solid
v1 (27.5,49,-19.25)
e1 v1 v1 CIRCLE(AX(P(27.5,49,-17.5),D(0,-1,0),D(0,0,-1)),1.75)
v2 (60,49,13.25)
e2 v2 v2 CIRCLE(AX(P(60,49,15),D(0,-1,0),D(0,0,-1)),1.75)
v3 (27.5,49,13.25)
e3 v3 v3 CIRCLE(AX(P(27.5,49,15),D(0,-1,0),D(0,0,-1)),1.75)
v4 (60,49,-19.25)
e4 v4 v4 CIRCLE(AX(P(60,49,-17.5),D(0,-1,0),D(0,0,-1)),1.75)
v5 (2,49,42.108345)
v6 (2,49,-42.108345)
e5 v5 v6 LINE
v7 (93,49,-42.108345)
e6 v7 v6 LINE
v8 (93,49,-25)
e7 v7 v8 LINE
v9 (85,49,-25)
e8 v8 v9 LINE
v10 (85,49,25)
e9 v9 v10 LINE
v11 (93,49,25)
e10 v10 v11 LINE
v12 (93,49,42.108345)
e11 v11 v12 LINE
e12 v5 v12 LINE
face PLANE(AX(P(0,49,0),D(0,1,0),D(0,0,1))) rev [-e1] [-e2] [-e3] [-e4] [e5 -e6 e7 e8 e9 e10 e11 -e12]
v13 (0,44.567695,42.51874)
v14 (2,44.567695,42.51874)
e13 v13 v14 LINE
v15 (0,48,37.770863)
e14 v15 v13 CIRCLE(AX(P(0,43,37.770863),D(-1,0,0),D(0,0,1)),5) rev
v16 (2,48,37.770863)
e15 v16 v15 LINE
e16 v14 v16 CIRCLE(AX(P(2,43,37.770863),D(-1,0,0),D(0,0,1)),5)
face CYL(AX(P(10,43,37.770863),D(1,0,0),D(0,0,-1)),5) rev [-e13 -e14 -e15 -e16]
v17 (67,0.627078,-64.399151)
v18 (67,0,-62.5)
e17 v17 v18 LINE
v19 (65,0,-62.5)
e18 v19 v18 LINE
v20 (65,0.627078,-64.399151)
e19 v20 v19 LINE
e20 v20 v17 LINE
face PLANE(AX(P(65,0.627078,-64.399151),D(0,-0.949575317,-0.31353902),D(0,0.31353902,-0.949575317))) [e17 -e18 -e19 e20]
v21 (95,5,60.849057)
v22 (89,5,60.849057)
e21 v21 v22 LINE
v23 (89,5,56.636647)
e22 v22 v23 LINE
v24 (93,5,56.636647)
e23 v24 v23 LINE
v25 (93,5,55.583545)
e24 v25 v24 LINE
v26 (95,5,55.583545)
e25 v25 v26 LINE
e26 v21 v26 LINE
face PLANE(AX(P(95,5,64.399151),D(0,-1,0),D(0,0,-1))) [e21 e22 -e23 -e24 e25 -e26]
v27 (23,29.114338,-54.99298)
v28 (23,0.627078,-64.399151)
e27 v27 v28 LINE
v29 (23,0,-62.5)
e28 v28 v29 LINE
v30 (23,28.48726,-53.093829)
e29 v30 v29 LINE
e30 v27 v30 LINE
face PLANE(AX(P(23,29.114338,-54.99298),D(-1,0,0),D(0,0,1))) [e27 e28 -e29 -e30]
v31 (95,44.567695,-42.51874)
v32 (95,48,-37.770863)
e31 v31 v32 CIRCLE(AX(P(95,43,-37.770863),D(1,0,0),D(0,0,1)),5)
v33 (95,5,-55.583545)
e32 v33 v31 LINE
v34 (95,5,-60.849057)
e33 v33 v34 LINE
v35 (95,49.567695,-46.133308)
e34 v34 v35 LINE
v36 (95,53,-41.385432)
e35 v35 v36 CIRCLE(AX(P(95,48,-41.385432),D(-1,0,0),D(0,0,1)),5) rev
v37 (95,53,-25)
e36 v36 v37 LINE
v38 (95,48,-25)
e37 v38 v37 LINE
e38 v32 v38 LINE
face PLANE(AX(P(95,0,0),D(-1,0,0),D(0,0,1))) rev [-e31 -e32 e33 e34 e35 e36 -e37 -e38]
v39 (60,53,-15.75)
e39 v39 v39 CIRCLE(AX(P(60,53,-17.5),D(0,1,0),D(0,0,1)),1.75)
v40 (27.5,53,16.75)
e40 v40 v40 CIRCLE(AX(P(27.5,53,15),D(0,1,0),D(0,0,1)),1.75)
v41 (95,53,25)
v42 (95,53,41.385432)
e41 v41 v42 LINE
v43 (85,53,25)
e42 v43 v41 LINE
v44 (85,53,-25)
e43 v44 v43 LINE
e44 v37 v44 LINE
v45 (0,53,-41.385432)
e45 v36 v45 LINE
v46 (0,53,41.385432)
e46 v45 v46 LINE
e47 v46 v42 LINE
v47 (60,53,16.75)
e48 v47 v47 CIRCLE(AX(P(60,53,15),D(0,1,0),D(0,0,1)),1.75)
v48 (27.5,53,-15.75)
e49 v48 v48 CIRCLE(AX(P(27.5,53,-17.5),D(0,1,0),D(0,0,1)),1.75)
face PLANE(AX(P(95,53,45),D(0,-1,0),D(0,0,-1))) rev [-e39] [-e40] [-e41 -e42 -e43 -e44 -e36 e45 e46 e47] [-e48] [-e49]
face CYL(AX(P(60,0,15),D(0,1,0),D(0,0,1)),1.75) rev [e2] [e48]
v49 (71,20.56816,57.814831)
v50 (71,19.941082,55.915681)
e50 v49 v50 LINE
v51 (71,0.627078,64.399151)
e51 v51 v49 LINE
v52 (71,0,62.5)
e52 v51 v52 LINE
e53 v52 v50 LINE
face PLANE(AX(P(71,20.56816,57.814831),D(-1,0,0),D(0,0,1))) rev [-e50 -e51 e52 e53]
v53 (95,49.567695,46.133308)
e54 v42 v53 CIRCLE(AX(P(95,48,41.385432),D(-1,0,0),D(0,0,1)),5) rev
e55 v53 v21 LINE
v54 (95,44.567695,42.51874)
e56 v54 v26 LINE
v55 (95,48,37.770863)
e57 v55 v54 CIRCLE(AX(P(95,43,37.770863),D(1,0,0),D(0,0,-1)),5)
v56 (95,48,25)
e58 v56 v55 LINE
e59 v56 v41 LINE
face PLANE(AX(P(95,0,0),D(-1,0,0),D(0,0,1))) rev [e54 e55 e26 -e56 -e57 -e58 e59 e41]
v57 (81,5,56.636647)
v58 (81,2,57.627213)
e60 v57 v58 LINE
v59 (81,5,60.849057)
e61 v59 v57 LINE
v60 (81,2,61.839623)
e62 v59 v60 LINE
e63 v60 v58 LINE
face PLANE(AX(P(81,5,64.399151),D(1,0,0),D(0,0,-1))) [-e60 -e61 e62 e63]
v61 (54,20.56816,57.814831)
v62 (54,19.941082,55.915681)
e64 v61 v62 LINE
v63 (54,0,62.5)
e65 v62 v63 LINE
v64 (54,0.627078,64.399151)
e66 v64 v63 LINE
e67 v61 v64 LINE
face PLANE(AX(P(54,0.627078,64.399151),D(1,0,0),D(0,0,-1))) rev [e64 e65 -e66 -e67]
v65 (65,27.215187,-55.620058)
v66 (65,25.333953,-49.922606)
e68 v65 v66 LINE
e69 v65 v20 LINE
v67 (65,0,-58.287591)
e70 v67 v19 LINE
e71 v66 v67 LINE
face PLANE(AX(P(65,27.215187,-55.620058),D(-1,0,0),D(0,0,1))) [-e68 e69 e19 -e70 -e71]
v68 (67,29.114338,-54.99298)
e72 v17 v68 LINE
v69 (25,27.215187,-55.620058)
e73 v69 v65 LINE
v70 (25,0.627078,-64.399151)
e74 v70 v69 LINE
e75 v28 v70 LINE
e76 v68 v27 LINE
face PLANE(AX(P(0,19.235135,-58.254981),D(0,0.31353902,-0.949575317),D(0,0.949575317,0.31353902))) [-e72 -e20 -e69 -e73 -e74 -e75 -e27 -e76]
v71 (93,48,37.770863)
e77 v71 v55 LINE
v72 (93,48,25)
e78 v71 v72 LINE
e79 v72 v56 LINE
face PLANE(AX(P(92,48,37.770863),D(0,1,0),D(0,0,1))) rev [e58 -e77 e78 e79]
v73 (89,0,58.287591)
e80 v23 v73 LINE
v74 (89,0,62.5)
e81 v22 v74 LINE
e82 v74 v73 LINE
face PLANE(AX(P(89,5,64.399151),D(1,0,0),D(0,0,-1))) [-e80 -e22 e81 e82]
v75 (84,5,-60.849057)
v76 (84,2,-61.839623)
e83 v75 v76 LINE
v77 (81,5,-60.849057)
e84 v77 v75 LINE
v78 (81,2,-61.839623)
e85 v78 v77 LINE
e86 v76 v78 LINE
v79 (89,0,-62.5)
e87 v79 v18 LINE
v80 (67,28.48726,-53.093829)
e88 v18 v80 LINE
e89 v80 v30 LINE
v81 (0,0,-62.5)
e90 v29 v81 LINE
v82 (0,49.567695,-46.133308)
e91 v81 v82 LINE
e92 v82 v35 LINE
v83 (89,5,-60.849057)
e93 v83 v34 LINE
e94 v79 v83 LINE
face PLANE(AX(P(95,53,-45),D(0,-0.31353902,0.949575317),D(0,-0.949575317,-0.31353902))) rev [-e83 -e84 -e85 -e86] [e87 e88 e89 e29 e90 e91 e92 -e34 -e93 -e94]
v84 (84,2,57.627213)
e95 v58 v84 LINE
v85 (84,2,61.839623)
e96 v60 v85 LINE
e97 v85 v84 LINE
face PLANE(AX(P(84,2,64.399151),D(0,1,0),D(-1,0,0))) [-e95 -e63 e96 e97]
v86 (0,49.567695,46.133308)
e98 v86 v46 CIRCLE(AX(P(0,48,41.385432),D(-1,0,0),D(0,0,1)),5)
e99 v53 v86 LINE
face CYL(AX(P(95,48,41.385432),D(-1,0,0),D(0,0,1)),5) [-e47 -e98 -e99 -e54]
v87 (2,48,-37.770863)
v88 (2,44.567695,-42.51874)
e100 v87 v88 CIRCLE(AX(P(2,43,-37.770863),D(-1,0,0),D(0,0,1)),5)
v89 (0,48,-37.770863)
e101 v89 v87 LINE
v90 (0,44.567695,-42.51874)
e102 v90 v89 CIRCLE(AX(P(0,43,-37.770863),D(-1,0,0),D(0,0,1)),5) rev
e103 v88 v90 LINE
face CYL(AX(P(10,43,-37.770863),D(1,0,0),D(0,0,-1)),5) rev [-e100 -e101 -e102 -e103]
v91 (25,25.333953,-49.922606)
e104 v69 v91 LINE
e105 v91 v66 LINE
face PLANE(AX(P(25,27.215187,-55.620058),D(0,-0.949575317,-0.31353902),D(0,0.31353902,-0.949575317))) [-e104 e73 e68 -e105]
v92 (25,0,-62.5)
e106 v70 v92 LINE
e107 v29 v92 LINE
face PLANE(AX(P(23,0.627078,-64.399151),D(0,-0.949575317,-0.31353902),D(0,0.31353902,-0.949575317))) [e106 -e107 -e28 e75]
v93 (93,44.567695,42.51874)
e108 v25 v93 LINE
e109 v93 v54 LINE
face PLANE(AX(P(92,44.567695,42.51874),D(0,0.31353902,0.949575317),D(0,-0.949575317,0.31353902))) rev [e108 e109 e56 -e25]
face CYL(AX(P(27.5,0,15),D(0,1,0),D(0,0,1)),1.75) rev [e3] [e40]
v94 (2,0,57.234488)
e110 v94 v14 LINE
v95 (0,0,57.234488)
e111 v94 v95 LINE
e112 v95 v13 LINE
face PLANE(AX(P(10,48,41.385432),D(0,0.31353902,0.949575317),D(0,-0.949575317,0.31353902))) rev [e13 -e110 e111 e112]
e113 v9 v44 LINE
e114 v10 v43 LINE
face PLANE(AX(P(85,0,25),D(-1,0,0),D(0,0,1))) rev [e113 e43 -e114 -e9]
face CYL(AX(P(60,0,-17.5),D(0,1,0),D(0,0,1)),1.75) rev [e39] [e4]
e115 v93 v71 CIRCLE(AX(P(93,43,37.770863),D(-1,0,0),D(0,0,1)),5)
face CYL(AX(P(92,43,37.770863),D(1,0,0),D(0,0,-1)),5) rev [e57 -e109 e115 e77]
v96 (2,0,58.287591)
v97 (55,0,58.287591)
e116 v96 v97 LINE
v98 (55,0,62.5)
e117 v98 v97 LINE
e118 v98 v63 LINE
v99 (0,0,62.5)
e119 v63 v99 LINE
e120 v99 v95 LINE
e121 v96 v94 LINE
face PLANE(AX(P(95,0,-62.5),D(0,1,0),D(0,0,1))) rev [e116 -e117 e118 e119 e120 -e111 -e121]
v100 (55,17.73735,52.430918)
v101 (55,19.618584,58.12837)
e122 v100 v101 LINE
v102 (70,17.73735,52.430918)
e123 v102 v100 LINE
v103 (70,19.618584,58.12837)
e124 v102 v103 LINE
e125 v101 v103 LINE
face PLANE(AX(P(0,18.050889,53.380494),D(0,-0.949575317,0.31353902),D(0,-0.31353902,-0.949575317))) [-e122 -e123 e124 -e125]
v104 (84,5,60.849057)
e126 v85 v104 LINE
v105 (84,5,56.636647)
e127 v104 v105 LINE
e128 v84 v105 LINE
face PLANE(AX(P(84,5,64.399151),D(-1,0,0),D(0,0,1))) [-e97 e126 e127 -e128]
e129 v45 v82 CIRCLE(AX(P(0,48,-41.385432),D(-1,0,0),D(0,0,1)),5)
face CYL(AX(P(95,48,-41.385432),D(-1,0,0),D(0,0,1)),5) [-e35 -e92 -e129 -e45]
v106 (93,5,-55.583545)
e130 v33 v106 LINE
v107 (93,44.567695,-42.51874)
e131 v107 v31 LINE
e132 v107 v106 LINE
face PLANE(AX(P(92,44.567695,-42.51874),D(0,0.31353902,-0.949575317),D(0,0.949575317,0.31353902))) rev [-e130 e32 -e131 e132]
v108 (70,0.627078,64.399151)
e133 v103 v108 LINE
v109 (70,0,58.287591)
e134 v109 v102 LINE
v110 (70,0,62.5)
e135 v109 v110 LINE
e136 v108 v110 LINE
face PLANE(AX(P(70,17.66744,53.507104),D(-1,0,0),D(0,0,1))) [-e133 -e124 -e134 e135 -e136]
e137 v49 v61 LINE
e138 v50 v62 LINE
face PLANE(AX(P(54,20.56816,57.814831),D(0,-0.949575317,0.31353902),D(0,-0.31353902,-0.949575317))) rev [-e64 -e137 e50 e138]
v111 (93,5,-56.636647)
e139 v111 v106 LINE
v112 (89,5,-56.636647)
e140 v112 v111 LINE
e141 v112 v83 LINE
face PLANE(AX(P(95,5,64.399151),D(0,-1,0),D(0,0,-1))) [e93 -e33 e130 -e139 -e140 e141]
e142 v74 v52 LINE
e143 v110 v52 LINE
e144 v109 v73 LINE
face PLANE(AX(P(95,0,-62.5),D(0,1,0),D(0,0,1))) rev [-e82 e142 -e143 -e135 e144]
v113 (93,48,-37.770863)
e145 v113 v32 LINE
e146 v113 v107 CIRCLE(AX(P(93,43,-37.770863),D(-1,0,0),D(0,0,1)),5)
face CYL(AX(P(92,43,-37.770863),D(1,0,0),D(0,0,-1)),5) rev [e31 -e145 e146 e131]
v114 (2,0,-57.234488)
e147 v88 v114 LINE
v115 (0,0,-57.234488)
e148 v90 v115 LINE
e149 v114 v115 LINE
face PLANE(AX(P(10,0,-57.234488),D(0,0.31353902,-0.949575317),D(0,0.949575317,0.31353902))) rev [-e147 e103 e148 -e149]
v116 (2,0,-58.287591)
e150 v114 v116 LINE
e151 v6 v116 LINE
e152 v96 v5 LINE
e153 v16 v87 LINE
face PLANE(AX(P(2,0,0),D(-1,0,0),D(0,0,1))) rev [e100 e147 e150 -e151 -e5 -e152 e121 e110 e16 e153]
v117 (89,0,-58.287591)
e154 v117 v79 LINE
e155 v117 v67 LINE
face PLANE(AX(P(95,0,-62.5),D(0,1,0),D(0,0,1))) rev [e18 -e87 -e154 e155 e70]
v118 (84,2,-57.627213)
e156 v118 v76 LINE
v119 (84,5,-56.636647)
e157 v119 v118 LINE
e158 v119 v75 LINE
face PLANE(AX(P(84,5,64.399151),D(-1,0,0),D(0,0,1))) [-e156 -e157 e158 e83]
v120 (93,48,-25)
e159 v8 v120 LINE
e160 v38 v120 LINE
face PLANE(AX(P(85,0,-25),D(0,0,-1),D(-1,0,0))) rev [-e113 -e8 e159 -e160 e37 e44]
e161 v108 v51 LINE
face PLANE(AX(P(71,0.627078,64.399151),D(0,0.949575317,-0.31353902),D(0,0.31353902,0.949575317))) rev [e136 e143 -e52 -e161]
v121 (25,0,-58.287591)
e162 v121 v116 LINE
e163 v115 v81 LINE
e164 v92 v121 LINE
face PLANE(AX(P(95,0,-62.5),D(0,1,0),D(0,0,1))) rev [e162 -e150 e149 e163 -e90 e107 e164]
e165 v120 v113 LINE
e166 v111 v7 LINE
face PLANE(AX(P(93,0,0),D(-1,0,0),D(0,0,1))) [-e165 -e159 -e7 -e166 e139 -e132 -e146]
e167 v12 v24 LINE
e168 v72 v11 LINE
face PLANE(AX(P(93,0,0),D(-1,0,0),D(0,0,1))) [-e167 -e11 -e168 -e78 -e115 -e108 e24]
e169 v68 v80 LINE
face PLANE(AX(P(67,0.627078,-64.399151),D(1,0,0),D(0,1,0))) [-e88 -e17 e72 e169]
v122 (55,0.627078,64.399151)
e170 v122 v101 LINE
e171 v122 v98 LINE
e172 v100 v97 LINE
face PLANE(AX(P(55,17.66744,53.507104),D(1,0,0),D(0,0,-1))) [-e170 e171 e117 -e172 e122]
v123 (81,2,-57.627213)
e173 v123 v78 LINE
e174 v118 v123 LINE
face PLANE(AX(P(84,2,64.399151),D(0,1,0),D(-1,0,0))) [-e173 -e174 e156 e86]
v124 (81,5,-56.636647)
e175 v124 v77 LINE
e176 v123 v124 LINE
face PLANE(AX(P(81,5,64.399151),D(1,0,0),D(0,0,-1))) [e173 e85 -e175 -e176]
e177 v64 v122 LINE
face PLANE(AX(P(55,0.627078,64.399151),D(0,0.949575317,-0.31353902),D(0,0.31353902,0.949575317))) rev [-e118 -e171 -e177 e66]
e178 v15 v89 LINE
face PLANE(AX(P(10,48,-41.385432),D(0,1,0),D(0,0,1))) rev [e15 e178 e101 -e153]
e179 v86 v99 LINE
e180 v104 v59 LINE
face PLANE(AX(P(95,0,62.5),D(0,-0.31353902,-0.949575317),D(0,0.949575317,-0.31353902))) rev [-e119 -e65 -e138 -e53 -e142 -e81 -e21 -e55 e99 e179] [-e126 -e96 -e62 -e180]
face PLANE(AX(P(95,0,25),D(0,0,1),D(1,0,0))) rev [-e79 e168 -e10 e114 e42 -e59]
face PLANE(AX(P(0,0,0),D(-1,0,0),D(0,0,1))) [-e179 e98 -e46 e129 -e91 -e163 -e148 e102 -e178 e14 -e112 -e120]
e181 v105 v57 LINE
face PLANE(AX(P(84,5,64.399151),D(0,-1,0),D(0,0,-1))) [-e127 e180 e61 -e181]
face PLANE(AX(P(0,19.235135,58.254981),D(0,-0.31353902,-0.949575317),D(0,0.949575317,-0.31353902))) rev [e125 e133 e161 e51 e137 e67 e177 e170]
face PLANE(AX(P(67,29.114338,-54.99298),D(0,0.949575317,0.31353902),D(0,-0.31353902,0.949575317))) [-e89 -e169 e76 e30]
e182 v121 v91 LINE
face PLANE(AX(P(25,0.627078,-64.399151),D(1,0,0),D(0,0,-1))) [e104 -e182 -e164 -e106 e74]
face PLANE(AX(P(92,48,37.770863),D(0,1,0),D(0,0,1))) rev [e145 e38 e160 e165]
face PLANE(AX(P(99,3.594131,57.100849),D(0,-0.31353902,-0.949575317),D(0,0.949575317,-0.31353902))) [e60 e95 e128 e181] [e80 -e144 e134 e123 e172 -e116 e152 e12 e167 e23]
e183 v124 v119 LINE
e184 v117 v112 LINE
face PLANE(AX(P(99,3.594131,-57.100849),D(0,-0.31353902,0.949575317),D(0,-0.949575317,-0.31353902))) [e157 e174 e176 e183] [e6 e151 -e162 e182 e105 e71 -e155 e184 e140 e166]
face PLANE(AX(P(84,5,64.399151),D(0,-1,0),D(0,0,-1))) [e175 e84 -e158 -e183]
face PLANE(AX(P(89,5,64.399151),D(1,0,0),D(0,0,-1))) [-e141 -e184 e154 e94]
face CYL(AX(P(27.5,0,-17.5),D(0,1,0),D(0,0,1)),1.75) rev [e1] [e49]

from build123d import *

# Parameters (mm, degrees)
EXTRUDE_1_DEPTH          = 95
EXTRUDE_3_DEPTH          = 20
CUT_EXTRUDE_1_DEPTH      = 142.209950074
CUT_EXTRUDE_1_DEPTH_BACK = 142.209950074
SKETCH_4_W               = 7
SKETCH_4_H               = 3
CUT_EXTRUDE_2_DEPTH      = 142.209950074
SHELL_START              = 2
SHELL_1_DEPTH            = 91
SHELL_START_2            = 93
SHELL_1_2_DEPTH          = 2.83772234
SHELL_1_3_DEPTH          = 3
CUT_EXTRUDE_3_DEPTH      = 3
SKETCH_7_R               = 1.75
SKETCH_7_W               = 10
SKETCH_7_H               = 50
CUT_EXTRUDE_4_DEPTH      = 142.209950074
SKETCH_9_W               = 15
SKETCH_9_H               = 20
CUT_EXTRUDE_5_DEPTH      = 3
EXTRUDE_4_DEPTH          = 2
EXTRUDE_6_DEPTH          = 2
SKETCH_13_W              = 40
SKETCH_13_H              = 28
CUT_EXTRUDE_6_DEPTH      = 2
CUT_EXTRUDE_7_DEPTH      = 10
FILLET_1_R               = 5
FILLET_2_R               = 5
EXTRUDE_7_DEPTH          = 2
EXTRUDE_8_DEPTH          = 2
SKETCH_17_R              = 1.75
EXTRUDE_9_DEPTH          = 2
SKETCH_18_W              = 120.1322677
SKETCH_18_H              = 134.585681159
CUT_EXTRUDE_8_DEPTH      = 2
SKETCH_20_W              = 175.540954957
SKETCH_20_H              = 97.306035525
CUT_EXTRUDE_9_DEPTH      = 39
CUT_EXTRUDE_10_DEPTH     = 39
SKETCH_23_W              = 6
SKETCH_23_H              = 5
SKETCH_23_W_2            = 3
SKETCH_23_H_2            = 3
CUT_EXTRUDE_11_DEPTH     = 181.790250578


with BuildPart() as part:
    # 草图1 → 凸台-拉伸1 (new body)
    with BuildSketch(Plane(origin=(0, 0, 0), x_dir=(0, 0, -1), z_dir=(1, 0, 0))):
        Polygon((-62.5, 0), (-45, 53), (45, 53), (62.5, 0), align=None)
    extrude(amount=EXTRUDE_1_DEPTH)

    # 草图3 → 凸台-拉伸3 (add)
    with BuildSketch(Plane(origin=(95, 0, 0), x_dir=(0, 0, -1), z_dir=(1, 0, 0))):
        Polygon((-60.849056604, 5), (-47.5, 5), (-47.5, 0), (-62.5, 0), align=None)
        Polygon((62.5, 0), (60.849056604, 5), (47.5, 5), (47.5, 0), align=None)
    extrude(amount=EXTRUDE_3_DEPTH)

    # 草图4 → 切除-拉伸1 (cut, two sides: drawn at the far end of the back side and taken through both)
    with BuildSketch(Plane.XY.offset(-CUT_EXTRUDE_1_DEPTH_BACK)):
        with Locations((105, 1.5)):
            Rectangle(SKETCH_4_W, SKETCH_4_H)
    extrude(amount=CUT_EXTRUDE_1_DEPTH + CUT_EXTRUDE_1_DEPTH_BACK, mode=Mode.SUBTRACT)

    # 草图5 → 切除-拉伸2 (cut, through all)
    with BuildSketch(Plane.XZ):
        with BuildLine():
            Line((97.5, -59), (97.5, -51))
            ThreePointArc((97.5, -51), (99, -49.5), (100.5, -51))
            Line((100.5, -51), (100.5, -59))
            ThreePointArc((100.5, -59), (99, -60.5), (97.5, -59))
        make_face()
        with BuildLine():
            Line((109.5, -59), (109.5, -51))
            ThreePointArc((109.5, -51), (111, -49.5), (112.5, -51))
            Line((112.5, -51), (112.5, -59))
            ThreePointArc((112.5, -59), (111, -60.5), (109.5, -59))
        make_face()
        with BuildLine():
            Line((97.5, 51), (97.5, 59))
            ThreePointArc((97.5, 59), (99, 60.5), (100.5, 59))
            Line((100.5, 59), (100.5, 51))
            ThreePointArc((100.5, 51), (99, 49.5), (97.5, 51))
        make_face()
        with BuildLine():
            Line((109.5, 51), (109.5, 59))
            ThreePointArc((109.5, 59), (111, 60.5), (112.5, 59))
            Line((112.5, 59), (112.5, 51))
            ThreePointArc((112.5, 51), (111, 49.5), (109.5, 51))
        make_face()
    extrude(amount=-CUT_EXTRUDE_2_DEPTH, mode=Mode.SUBTRACT)

    # 抽壳1: read off the stored shape, not the designer's step
    # 抽壳1 outline → 抽壳1 (cut)
    with BuildSketch(Plane.YZ.offset(SHELL_START)):
        Polygon((51, 43.554172654), (0, 60.393795296), (0, -60.393795296), (51, -43.554172654), align=None)
    extrude(amount=SHELL_1_DEPTH, mode=Mode.SUBTRACT)

    # Shell 1 2 outline → Shell 1 2 (cut)
    with BuildSketch(Plane.YZ.offset(SHELL_START_2)):
        Polygon((3, 49.5), (3, 59.403229258), (0, 60.393795296), (0, 49.5), align=None)
        Polygon((3, -49.5), (0, -49.5), (0, -60.393795296), (3, -59.403229258), align=None)
    extrude(amount=SHELL_1_2_DEPTH, mode=Mode.SUBTRACT)

    # Shell 1 3 outline → Shell 1 3 (add)
    with BuildSketch(Plane(origin=(0, 0, 0), x_dir=(1, 0, 0), z_dir=(0, 1, 0))):
        with BuildLine():
            Line((95.789496196, -60.393795296), (95.83772234, -60.504880632))
            Line((95.83772234, -60.504880632), (95.83772234, -49.5))
            ThreePointArc((95.83772234, -49.5), (95.585474278, -50.231225589), (95.5, -51))
            Line((95.5, -51), (95.5, -59))
            ThreePointArc((95.5, -59), (95.57313822, -59.711771272), (95.789496196, -60.393795296))
        make_face()
        with BuildLine():
            ThreePointArc((95.789496196, 60.393795296), (95.57313822, 59.711771272), (95.5, 59))
            Line((95.5, 59), (95.5, 51))
            ThreePointArc((95.5, 51), (95.585474278, 50.231225589), (95.83772234, 49.5))
            Line((95.83772234, 49.5), (95.83772234, 60.504880632))
            Line((95.83772234, 60.504880632), (95.789496196, 60.393795296))
        make_face()
    extrude(amount=SHELL_1_3_DEPTH)

    # 草图6 → 切除-拉伸3 (cut)
    with BuildSketch(Plane(origin=(95, 0, 0), x_dir=(0, 0, -1), z_dir=(1, 0, 0))):
        with BuildLine():
            Line((-37.770863272, 48), (37.770863272, 48))
            ThreePointArc((37.770863272, 48), (40.700157086, 47.052065862), (42.518739858, 44.567695099))
            Line((42.518739858, 44.567695099), (55.583544844, 5))
            Line((55.583544844, 5), (47.5, 5))
            Line((47.5, 5), (47.5, 0))
            Line((47.5, 0), (-47.5, 0))
            Line((-47.5, 0), (-47.5, 5))
            Line((-47.5, 5), (-55.583544844, 5))
            Line((-55.583544844, 5), (-42.518739858, 44.567695099))
            ThreePointArc((-42.518739858, 44.567695099), (-40.700157086, 47.052065862), (-37.770863272, 48))
        make_face()
    extrude(amount=-CUT_EXTRUDE_3_DEPTH, mode=Mode.SUBTRACT)

    # 草图7 → 切除-拉伸4 (cut, through all)
    with BuildSketch(Plane(origin=(0, 53, 0), x_dir=(1, 0, 0), z_dir=(0, 1, 0))):
        with Locations(Location((60, -15, 0), (0, 0, 270))):
            Circle(SKETCH_7_R)
        with Locations(Location((60, 17.5, 0), (0, 0, 270))):
            Circle(SKETCH_7_R)
        with Locations(Location((27.5, 17.5, 0), (0, 0, 270))):
            Circle(SKETCH_7_R)
        with Locations(Location((27.5, -15, 0), (0, 0, 270))):
            Circle(SKETCH_7_R)
        with Locations((90, 0)):
            Rectangle(SKETCH_7_W, SKETCH_7_H)
    extrude(amount=-CUT_EXTRUDE_4_DEPTH, mode=Mode.SUBTRACT)

    # 草图9 → 切除-拉伸5 (cut)
    with BuildSketch(Plane(origin=(0, 18.608057138, 56.35583019), x_dir=(1, 0, 0), z_dir=(0, 0.3135390198315126, 0.949575317204009))):
        with Locations((62.5, -9.596188739)):
            Rectangle(SKETCH_9_W, SKETCH_9_H)
    extrude(amount=-CUT_EXTRUDE_5_DEPTH, mode=Mode.SUBTRACT)

    # 草图10 → 凸台-拉伸4 (add)
    with BuildSketch(Plane(origin=(0, 18.608057138, 56.35583019), x_dir=(1, 0, 0), z_dir=(0, 0.3135390198315126, 0.949575317204009))):
        Polygon((55, -19.596188739), (54, -19.596188739), (54, 1.403811261), (71, 1.403811261), (71, -19.596188739), (70, -19.596188739), (70, 0.403811261), (55, 0.403811261), align=None)
    extrude(amount=EXTRUDE_4_DEPTH)

    # 草图11 → 凸台-拉伸6 (add)
    with BuildSketch(Plane(origin=(0, 18.608057138, -56.35583019), x_dir=(-1, 0, 0), z_dir=(0, 0.3135390198315126, -0.949575317204009))):
        Polygon((-67, -19.596188739), (-67, 10.403811261), (-23, 10.403811261), (-23, -19.596188739), (-25, -19.596188739), (-25, 8.403811261), (-65, 8.403811261), (-65, -19.596188739), align=None)
    extrude(amount=EXTRUDE_6_DEPTH)

    # 草图13 → 切除-拉伸6 (cut)
    with BuildSketch(Plane(origin=(0, 18.608057138, -56.35583019), x_dir=(-1, 0, 0), z_dir=(0, 0.3135390198315126, -0.949575317204009))):
        with Locations((-45, -5.596188739)):
            Rectangle(SKETCH_13_W, SKETCH_13_H)
    extrude(amount=-CUT_EXTRUDE_6_DEPTH, mode=Mode.SUBTRACT)

    # 草图14 → 切除-拉伸7 (cut)
    with BuildSketch(Plane.ZY):
        Polygon((-41.385431636, 48), (41.385431636, 48), (57.23448824, 0), (-57.23448824, 0), align=None)
    extrude(amount=-CUT_EXTRUDE_7_DEPTH, mode=Mode.SUBTRACT)

    # 圆角1
    fillet_1_edges = [part.edges().sort_by_distance(p)[0] for p in [
        (47.5, 53, 45),
        (47.5, 53, -45),
    ]]
    fillet(fillet_1_edges, radius=FILLET_1_R)

    # 圆角2
    fillet_2_edges = [part.edges().sort_by_distance(p)[0] for p in [
        (1, 48, -41.385431636),
        (1, 48, 41.385431636),
    ]]
    fillet(fillet_2_edges, radius=FILLET_2_R)

    # 草图15 → 凸台-拉伸7 (add)
    with BuildSketch(Plane(origin=(0, 17.980979099, 54.456679556), x_dir=(-1, 0, 0), z_dir=(0, -0.3135390198315126, -0.949575317204009))):
        with BuildLine():
            Line((-70, -18.935811381), (-70, 0.403811261))
            Line((-70, 0.403811261), (-55, 0.403811261))
            Line((-55, 0.403811261), (-55, -18.935811381))
            Line((-55, -18.935811381), (-2, -18.935811381))
            Line((-2, -18.935811381), (-2, 34.772408574))
            Line((-2, 34.772408574), (-93, 34.772408574))
            Line((-93, 34.772408574), (-93, -15.776504325))
            Line((-93, -15.776504325), (-95.523305282, -15.776504325))
            add(Edge.make_bspline(
                [(-95.789496196, -18.935811381), (-95.583035108, -17.41903761), (-95.523305282, -15.776504325)],
                knots=[1.16121292, 1.16121292, 1.16121292, 1.455331574, 1.455331574, 1.455331574], degree=2, weights=[1, 0.989206251, 1]))
            Line((-95.789496196, -18.935811381), (-70, -18.935811381))
        make_face()
    extrude(amount=EXTRUDE_7_DEPTH)

    # 草图16 → 凸台-拉伸8 (add)
    with BuildSketch(Plane(origin=(0, 17.980979099, -54.456679556), x_dir=(1, 0, 0), z_dir=(0, -0.3135390198315126, 0.949575317204009))):
        with BuildLine():
            Line((65, 8.403811261), (65, -18.935811381))
            Line((65, -18.935811381), (95.789496196, -18.935811381))
            add(Edge.make_bspline(
                [(95.523305282, -15.776504325), (95.583035108, -17.41903761), (95.789496196, -18.935811381)],
                knots=[4.827853734, 4.827853734, 4.827853734, 5.121972388, 5.121972388, 5.121972388], degree=2, weights=[1, 0.989206251, 1]))
            Line((95.523305282, -15.776504325), (93, -15.776504325))
            Line((93, -15.776504325), (93, 34.772408574))
            Line((93, 34.772408574), (2, 34.772408574))
            Line((2, 34.772408574), (2, -18.935811381))
            Line((2, -18.935811381), (25, -18.935811381))
            Line((25, -18.935811381), (25, 8.403811261))
            Line((25, 8.403811261), (65, 8.403811261))
        make_face()
    extrude(amount=EXTRUDE_8_DEPTH)

    # 草图17 → 凸台-拉伸9 (add)
    with BuildSketch(Plane.XZ.offset(-51)):
        Polygon((85, 25), (93, 25), (93, 43.554172654), (2, 43.554172654), (2, -43.554172654), (93, -43.554172654), (93, -25), (85, -25), align=None)
        with Locations(Location((60, -17.5, 0), (0, 0, 90))):
            Circle(SKETCH_17_R, mode=Mode.SUBTRACT)
        with Locations(Location((27.5, -17.5, 0), (0, 0, 90))):
            Circle(SKETCH_17_R, mode=Mode.SUBTRACT)
        with Locations(Location((60, 15, 0), (0, 0, 90))):
            Circle(SKETCH_17_R, mode=Mode.SUBTRACT)
        with Locations(Location((27.5, 15, 0), (0, 0, 90))):
            Circle(SKETCH_17_R, mode=Mode.SUBTRACT)
    extrude(amount=EXTRUDE_9_DEPTH)

    # 草图18 → 切除-拉伸8 (cut)
    with BuildSketch(Plane(origin=(0, 0, 0), x_dir=(1, 0, 0), z_dir=(0, 1, 0))):
        with Locations((58.156973339, 0.12316308)):
            Rectangle(SKETCH_18_W, SKETCH_18_H)
    extrude(amount=-CUT_EXTRUDE_8_DEPTH, mode=Mode.SUBTRACT)

    # 草图20 → 切除-拉伸9 (cut)
    with BuildSketch(Plane(origin=(95, 0, 0), x_dir=(0, 0, -1), z_dir=(1, 0, 0))):
        with Locations((3.171805167, 26.174924158)):
            Rectangle(SKETCH_20_W, SKETCH_20_H)
    extrude(amount=CUT_EXTRUDE_9_DEPTH, mode=Mode.SUBTRACT)

    # 草图21 → 切除-拉伸10 (cut)
    with BuildSketch(Plane(origin=(95, 0, 0), x_dir=(0, 0, -1), z_dir=(1, 0, 0))):
        Polygon((-43.861204642, 40.501944611), (-57.23448824, 0), (57.23448824, 0), (43.861204642, 40.501944611), align=None)
    extrude(amount=-CUT_EXTRUDE_10_DEPTH, mode=Mode.SUBTRACT)

    # 草图23 → 切除-拉伸11 (cut, through all)
    with BuildSketch(Plane.XY.offset(-80)):
        with Locations((92, 2.5)):
            Rectangle(SKETCH_23_W, SKETCH_23_H)
        with Locations((82.5, 3.5)):
            Rectangle(SKETCH_23_W_2, SKETCH_23_H_2)
    extrude(amount=CUT_EXTRUDE_11_DEPTH, mode=Mode.SUBTRACT)


solid = part.part
